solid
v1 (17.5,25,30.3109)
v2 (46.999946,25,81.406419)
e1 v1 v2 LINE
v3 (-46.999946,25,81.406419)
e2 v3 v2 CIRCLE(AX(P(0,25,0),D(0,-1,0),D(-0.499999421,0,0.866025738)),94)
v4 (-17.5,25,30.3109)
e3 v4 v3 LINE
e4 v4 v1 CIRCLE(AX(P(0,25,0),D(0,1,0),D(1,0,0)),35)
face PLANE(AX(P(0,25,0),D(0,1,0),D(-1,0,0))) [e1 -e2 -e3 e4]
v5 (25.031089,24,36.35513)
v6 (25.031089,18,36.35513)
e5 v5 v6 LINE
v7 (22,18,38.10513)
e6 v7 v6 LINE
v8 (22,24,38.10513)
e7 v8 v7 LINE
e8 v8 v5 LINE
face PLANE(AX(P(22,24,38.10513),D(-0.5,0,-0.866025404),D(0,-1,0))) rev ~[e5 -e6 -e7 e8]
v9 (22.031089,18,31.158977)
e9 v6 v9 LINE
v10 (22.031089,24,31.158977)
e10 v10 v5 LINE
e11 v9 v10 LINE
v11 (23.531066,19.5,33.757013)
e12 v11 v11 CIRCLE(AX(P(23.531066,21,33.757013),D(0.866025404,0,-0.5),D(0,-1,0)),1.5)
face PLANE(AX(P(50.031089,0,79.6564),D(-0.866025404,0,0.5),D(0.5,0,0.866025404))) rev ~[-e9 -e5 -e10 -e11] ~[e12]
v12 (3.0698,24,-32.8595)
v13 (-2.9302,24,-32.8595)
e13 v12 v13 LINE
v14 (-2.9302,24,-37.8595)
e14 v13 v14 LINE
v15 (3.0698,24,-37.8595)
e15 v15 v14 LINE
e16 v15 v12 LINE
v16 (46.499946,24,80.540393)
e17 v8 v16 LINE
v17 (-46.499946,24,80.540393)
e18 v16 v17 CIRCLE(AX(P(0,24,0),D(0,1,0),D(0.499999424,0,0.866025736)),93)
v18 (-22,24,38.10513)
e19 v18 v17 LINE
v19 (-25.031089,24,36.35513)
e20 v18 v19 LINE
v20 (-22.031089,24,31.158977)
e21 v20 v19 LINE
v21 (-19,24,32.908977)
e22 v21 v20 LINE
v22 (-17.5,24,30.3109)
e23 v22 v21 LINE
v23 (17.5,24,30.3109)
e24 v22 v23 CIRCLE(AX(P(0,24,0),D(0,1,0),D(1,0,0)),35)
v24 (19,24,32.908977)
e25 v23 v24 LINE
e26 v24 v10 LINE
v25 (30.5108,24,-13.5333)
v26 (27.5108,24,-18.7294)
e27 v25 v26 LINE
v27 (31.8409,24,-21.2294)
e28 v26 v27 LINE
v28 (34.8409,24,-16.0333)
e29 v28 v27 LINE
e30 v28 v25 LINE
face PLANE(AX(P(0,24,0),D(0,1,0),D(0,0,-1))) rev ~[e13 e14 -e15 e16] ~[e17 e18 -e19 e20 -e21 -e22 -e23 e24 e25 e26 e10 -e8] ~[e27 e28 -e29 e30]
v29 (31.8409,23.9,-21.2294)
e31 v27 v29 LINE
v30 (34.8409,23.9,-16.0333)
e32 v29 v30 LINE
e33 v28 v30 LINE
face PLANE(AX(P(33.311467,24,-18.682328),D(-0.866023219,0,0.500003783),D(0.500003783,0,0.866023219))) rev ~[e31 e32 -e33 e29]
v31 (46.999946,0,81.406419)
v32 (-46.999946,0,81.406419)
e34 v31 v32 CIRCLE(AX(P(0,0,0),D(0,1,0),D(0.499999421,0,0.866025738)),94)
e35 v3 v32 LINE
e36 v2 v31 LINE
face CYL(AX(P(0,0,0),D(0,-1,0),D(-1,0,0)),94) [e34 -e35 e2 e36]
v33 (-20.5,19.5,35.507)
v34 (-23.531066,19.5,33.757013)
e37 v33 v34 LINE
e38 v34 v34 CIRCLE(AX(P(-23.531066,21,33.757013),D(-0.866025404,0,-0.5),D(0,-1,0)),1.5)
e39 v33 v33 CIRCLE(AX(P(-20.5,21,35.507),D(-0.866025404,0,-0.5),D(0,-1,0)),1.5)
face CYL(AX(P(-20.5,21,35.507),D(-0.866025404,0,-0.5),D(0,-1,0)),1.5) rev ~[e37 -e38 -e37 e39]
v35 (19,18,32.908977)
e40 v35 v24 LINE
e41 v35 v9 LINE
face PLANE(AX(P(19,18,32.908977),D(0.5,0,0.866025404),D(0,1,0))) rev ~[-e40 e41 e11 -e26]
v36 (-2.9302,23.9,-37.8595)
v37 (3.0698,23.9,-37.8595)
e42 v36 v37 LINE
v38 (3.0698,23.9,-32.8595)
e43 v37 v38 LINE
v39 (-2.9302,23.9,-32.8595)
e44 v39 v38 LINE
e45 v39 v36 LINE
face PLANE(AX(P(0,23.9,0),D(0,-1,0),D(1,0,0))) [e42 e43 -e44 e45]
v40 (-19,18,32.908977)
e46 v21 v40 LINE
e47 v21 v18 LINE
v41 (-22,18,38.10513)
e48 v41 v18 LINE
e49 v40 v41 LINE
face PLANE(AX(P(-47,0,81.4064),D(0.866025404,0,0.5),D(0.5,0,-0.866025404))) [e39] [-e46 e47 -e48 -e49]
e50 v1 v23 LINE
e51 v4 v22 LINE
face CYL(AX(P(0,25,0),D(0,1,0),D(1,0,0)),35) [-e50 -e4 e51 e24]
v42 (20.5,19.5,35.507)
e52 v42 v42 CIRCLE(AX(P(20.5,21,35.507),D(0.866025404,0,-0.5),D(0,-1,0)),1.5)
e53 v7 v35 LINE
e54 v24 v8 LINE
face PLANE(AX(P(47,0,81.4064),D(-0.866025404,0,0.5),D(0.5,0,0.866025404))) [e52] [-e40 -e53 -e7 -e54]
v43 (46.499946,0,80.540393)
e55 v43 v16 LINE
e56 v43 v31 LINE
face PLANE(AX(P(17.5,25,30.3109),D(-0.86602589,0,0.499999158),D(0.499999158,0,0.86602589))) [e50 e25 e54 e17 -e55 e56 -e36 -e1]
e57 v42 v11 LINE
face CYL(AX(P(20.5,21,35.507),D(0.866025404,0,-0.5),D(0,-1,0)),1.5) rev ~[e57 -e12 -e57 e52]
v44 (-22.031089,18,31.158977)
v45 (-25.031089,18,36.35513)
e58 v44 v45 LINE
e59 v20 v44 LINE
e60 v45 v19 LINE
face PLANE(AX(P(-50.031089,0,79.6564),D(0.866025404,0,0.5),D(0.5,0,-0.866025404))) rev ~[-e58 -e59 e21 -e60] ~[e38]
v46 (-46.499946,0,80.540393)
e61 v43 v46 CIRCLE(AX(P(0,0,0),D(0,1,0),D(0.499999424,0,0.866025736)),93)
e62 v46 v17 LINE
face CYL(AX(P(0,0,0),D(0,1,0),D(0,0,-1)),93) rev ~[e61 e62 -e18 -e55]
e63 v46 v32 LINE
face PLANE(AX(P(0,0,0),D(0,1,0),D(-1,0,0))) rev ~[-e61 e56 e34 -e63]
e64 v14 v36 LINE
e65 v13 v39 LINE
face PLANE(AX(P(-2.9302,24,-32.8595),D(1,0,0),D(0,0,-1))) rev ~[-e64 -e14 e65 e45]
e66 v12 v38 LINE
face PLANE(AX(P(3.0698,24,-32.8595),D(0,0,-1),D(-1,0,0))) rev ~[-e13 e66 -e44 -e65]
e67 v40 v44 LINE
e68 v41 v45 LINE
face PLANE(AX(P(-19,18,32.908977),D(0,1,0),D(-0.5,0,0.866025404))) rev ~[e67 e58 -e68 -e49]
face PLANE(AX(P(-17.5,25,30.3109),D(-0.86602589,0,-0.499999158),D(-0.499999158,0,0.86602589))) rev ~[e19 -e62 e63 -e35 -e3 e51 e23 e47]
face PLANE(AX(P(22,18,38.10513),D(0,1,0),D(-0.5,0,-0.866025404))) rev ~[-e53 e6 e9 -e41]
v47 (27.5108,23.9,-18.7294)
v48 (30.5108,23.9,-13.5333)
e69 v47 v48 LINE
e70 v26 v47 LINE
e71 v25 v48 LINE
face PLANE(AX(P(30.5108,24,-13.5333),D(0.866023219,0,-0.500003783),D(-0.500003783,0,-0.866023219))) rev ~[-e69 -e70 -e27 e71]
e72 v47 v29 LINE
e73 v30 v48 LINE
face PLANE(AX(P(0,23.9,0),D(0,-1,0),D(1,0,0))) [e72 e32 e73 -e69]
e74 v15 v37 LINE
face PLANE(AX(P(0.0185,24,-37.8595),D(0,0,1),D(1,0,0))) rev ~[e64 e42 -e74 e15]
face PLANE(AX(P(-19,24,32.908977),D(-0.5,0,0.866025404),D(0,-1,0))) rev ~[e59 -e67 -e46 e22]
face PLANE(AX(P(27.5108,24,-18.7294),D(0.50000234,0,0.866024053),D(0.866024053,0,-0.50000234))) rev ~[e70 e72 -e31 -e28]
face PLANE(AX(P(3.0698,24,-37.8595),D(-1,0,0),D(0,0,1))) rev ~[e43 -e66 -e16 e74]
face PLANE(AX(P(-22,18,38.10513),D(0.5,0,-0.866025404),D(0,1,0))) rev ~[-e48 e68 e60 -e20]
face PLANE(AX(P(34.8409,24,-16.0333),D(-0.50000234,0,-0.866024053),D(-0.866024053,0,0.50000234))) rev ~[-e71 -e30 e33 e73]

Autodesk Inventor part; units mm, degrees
ref_plane "YZ Plane" through (0, 0, 0) normal (1, 0, 0) x (0, 1, 0)
ref_plane "XZ Plane" through (0, 0, 0) normal (0, 1, 0) x (-1, 0, 0)
ref_plane "XY Plane" through (0, 0, 0) normal (0, 0, 1) x (1, 0, 0)
sketch "Sketch1" plane through (0, 0, 0) normal (0, 1, 0) x (-1, 0, 0)
  circle A0 centre (0, 0) radius 94
  dimension "d0" = 188
extrude "Extrusion1" add sketch "Sketch1" along normal blind 25
sketch "Sketch2" plane through (0, 0, 0) normal (0, -1, 0) x (1, 0, 0)
  point P0 (0, 0)
  point P1 (0, 0)
hole "Hole1" at (0, 0, 0) direction (0, 1, 0) diameter 186 depth 24
sketch "Sketch11" plane through (0, 25, 0) normal (0, 1, 0) x (1, 0, 0)
  circle A0 centre (0, 0) radius 94.1047
  circle A1 centre (0, 0) radius 35
  line L0 (35, 0) -> (94.1047, 0)
  line L1 (17.5, 30.3109) -> (47.0523, 81.4971)
  line L2 (-17.5, 30.3109) -> (-47.0523, 81.4971)
  line L3 (-35, 0) -> (-94.1047, 0)
  line L4 (-17.5, -30.3109) -> (-47.0523, -81.4971)
  line L5 (17.5, -30.3109) -> (47.0523, -81.4971)
  dimension "d46" = 70
  dimension "d49" = 360
extrude "Extrusion4" cut sketch "Sketch11" against normal blind 30 contours A0 L4 A1 L5
sketch "Sketch5" plane through (0, 24, 0) normal (0, -1, 0) x (1, 0, 0)
  circle A0 centre (0.0185, 0.5394) radius 32.5
  circle A1 centre (0.0185, 0.5394) radius 91
  line L0 (0.0185, -31.9606) -> (0.0185, -90.4606)
  line L1 (-28.1273, -15.7106) -> (-78.7898, -44.9606)
  line L2 (-28.1273, 16.7894) -> (-78.7898, 46.0394)
  line L3 (0.0185, 33.0394) -> (0.0185, 91.5394)
  line L4 (28.1643, 16.7894) -> (78.8268, 46.0394)
  line L5 (27.2527, -15.1843) -> (78.8268, -44.9606)
  line L6 (30.5108, -13.5333) -> (27.5108, -18.7294)
  line L7 (27.5108, -18.7294) -> (31.8409, -21.2294)
  line L8 (31.8409, -21.2294) -> (34.8409, -16.0333)
  line L9 (34.8409, -16.0333) -> (30.5108, -13.5333)
  line L10 (-2.9302, -37.8595) -> (3.0698, -37.8595)
  line L11 (3.0698, -32.8595) -> (-2.9302, -32.8595)
  line L12 (-2.9302, -32.8595) -> (-2.9302, -37.8595)
  line L13 (3.0698, -37.8595) -> (3.0698, -32.8595)
  point P0 (0, 0)
  point P1 (24.0416, -20.6125)
  point P2 (3.0698, -35.3595)
  dimension "d23" = 65
  dimension "d30" = 360
  dimension "d38" = 6
  dimension "d39" = 5
  dimension "d40" = 6
  dimension "d41" = 5
extrude "Extrusion3" add sketch "Sketch5" along normal blind 0.1 contours L6 L9 L8 L5 | L5 L8 L7 L6 | L11 L13 L10 L0 | L0 L10 L12 L11
sketch "Sketch12" plane through (-47, 0, 81.4064) normal (0.8660254, 0, 0.5) x (0.5, 0, -0.8660254)
  point P0 (94, 0)
sketch "Sketch13" plane through (-47, 0, 81.4064) normal (0.8660254, 0, 0.5) x (0.5, 0, -0.8660254)
  line L0 (59, 24) -> (1, 24) projected
  line L1 (50, 24) -> (56, 24)
  line L2 (56, 24) -> (56, 18)
  line L3 (56, 18) -> (50, 18)
  line L4 (50, 18) -> (50, 24)
  line L5 (59, 25) -> (59, 24) projected
  point P0 (94, 0)
  dimension "d53" = 6
  dimension "d54" = 6
  dimension "d55" = 3
extrude "Extrusion5" add sketch "Sketch13" against normal blind 3.5
sketch "Sketch14" plane through (-47, 0, 81.4064) normal (0.8660254, 0, 0.5) x (0.5, 0, -0.8660254)
  circle A0 centre (53, 21) radius 1.5
  line L0 (50, 24) -> (50, 18) projected
  line L1 (50, 18) -> (56, 18) projected
  point P0 (94, 0)
  dimension "d58" = 3
  dimension "d59" = 3
  dimension "d60" = 3
hole "Hole2" at (-20.5, 21, 35.507) direction (-0.8660254, 0, -0.5) diameter 3 depth 29
sketch "Sketch15" plane through (47, 0, 81.4064) normal (-0.8660254, 0, 0.5) x (0.5, 0, 0.8660254)
  line L0 (-56, 24) -> (-50, 24)
  line L1 (-50, 24) -> (-50, 18)
  line L2 (-50, 18) -> (-56, 18)
  line L3 (-56, 18) -> (-56, 24)
  line L4 (-59, 25) -> (-59, 24) projected
  line L5 (-1, 24) -> (-59, 24) projected
  point P0 (-94, 0)
  dimension "d68" = 6
  dimension "d69" = 6
  dimension "d70" = 3
  dimension "d71" = 0
extrude "Extrusion6" add sketch "Sketch15" against normal blind 3.5
sketch "Sketch16" plane through (47, 0, 81.4064) normal (-0.8660254, 0, 0.5) x (0.5, 0, 0.8660254)
  circle A0 centre (-53, 21) radius 1.5
  line L0 (-56, 24) -> (-56, 18) projected
  line L1 (-50, 24) -> (-56, 24) projected
  point P0 (-94, 0)
  dimension "d74" = 3
  dimension "d75" = 3
  dimension "d76" = 3
hole "Hole3" at (20.5, 21, 35.507) direction (0.8660254, 0, -0.5) diameter 3 depth 29
properties part number "Cover"
